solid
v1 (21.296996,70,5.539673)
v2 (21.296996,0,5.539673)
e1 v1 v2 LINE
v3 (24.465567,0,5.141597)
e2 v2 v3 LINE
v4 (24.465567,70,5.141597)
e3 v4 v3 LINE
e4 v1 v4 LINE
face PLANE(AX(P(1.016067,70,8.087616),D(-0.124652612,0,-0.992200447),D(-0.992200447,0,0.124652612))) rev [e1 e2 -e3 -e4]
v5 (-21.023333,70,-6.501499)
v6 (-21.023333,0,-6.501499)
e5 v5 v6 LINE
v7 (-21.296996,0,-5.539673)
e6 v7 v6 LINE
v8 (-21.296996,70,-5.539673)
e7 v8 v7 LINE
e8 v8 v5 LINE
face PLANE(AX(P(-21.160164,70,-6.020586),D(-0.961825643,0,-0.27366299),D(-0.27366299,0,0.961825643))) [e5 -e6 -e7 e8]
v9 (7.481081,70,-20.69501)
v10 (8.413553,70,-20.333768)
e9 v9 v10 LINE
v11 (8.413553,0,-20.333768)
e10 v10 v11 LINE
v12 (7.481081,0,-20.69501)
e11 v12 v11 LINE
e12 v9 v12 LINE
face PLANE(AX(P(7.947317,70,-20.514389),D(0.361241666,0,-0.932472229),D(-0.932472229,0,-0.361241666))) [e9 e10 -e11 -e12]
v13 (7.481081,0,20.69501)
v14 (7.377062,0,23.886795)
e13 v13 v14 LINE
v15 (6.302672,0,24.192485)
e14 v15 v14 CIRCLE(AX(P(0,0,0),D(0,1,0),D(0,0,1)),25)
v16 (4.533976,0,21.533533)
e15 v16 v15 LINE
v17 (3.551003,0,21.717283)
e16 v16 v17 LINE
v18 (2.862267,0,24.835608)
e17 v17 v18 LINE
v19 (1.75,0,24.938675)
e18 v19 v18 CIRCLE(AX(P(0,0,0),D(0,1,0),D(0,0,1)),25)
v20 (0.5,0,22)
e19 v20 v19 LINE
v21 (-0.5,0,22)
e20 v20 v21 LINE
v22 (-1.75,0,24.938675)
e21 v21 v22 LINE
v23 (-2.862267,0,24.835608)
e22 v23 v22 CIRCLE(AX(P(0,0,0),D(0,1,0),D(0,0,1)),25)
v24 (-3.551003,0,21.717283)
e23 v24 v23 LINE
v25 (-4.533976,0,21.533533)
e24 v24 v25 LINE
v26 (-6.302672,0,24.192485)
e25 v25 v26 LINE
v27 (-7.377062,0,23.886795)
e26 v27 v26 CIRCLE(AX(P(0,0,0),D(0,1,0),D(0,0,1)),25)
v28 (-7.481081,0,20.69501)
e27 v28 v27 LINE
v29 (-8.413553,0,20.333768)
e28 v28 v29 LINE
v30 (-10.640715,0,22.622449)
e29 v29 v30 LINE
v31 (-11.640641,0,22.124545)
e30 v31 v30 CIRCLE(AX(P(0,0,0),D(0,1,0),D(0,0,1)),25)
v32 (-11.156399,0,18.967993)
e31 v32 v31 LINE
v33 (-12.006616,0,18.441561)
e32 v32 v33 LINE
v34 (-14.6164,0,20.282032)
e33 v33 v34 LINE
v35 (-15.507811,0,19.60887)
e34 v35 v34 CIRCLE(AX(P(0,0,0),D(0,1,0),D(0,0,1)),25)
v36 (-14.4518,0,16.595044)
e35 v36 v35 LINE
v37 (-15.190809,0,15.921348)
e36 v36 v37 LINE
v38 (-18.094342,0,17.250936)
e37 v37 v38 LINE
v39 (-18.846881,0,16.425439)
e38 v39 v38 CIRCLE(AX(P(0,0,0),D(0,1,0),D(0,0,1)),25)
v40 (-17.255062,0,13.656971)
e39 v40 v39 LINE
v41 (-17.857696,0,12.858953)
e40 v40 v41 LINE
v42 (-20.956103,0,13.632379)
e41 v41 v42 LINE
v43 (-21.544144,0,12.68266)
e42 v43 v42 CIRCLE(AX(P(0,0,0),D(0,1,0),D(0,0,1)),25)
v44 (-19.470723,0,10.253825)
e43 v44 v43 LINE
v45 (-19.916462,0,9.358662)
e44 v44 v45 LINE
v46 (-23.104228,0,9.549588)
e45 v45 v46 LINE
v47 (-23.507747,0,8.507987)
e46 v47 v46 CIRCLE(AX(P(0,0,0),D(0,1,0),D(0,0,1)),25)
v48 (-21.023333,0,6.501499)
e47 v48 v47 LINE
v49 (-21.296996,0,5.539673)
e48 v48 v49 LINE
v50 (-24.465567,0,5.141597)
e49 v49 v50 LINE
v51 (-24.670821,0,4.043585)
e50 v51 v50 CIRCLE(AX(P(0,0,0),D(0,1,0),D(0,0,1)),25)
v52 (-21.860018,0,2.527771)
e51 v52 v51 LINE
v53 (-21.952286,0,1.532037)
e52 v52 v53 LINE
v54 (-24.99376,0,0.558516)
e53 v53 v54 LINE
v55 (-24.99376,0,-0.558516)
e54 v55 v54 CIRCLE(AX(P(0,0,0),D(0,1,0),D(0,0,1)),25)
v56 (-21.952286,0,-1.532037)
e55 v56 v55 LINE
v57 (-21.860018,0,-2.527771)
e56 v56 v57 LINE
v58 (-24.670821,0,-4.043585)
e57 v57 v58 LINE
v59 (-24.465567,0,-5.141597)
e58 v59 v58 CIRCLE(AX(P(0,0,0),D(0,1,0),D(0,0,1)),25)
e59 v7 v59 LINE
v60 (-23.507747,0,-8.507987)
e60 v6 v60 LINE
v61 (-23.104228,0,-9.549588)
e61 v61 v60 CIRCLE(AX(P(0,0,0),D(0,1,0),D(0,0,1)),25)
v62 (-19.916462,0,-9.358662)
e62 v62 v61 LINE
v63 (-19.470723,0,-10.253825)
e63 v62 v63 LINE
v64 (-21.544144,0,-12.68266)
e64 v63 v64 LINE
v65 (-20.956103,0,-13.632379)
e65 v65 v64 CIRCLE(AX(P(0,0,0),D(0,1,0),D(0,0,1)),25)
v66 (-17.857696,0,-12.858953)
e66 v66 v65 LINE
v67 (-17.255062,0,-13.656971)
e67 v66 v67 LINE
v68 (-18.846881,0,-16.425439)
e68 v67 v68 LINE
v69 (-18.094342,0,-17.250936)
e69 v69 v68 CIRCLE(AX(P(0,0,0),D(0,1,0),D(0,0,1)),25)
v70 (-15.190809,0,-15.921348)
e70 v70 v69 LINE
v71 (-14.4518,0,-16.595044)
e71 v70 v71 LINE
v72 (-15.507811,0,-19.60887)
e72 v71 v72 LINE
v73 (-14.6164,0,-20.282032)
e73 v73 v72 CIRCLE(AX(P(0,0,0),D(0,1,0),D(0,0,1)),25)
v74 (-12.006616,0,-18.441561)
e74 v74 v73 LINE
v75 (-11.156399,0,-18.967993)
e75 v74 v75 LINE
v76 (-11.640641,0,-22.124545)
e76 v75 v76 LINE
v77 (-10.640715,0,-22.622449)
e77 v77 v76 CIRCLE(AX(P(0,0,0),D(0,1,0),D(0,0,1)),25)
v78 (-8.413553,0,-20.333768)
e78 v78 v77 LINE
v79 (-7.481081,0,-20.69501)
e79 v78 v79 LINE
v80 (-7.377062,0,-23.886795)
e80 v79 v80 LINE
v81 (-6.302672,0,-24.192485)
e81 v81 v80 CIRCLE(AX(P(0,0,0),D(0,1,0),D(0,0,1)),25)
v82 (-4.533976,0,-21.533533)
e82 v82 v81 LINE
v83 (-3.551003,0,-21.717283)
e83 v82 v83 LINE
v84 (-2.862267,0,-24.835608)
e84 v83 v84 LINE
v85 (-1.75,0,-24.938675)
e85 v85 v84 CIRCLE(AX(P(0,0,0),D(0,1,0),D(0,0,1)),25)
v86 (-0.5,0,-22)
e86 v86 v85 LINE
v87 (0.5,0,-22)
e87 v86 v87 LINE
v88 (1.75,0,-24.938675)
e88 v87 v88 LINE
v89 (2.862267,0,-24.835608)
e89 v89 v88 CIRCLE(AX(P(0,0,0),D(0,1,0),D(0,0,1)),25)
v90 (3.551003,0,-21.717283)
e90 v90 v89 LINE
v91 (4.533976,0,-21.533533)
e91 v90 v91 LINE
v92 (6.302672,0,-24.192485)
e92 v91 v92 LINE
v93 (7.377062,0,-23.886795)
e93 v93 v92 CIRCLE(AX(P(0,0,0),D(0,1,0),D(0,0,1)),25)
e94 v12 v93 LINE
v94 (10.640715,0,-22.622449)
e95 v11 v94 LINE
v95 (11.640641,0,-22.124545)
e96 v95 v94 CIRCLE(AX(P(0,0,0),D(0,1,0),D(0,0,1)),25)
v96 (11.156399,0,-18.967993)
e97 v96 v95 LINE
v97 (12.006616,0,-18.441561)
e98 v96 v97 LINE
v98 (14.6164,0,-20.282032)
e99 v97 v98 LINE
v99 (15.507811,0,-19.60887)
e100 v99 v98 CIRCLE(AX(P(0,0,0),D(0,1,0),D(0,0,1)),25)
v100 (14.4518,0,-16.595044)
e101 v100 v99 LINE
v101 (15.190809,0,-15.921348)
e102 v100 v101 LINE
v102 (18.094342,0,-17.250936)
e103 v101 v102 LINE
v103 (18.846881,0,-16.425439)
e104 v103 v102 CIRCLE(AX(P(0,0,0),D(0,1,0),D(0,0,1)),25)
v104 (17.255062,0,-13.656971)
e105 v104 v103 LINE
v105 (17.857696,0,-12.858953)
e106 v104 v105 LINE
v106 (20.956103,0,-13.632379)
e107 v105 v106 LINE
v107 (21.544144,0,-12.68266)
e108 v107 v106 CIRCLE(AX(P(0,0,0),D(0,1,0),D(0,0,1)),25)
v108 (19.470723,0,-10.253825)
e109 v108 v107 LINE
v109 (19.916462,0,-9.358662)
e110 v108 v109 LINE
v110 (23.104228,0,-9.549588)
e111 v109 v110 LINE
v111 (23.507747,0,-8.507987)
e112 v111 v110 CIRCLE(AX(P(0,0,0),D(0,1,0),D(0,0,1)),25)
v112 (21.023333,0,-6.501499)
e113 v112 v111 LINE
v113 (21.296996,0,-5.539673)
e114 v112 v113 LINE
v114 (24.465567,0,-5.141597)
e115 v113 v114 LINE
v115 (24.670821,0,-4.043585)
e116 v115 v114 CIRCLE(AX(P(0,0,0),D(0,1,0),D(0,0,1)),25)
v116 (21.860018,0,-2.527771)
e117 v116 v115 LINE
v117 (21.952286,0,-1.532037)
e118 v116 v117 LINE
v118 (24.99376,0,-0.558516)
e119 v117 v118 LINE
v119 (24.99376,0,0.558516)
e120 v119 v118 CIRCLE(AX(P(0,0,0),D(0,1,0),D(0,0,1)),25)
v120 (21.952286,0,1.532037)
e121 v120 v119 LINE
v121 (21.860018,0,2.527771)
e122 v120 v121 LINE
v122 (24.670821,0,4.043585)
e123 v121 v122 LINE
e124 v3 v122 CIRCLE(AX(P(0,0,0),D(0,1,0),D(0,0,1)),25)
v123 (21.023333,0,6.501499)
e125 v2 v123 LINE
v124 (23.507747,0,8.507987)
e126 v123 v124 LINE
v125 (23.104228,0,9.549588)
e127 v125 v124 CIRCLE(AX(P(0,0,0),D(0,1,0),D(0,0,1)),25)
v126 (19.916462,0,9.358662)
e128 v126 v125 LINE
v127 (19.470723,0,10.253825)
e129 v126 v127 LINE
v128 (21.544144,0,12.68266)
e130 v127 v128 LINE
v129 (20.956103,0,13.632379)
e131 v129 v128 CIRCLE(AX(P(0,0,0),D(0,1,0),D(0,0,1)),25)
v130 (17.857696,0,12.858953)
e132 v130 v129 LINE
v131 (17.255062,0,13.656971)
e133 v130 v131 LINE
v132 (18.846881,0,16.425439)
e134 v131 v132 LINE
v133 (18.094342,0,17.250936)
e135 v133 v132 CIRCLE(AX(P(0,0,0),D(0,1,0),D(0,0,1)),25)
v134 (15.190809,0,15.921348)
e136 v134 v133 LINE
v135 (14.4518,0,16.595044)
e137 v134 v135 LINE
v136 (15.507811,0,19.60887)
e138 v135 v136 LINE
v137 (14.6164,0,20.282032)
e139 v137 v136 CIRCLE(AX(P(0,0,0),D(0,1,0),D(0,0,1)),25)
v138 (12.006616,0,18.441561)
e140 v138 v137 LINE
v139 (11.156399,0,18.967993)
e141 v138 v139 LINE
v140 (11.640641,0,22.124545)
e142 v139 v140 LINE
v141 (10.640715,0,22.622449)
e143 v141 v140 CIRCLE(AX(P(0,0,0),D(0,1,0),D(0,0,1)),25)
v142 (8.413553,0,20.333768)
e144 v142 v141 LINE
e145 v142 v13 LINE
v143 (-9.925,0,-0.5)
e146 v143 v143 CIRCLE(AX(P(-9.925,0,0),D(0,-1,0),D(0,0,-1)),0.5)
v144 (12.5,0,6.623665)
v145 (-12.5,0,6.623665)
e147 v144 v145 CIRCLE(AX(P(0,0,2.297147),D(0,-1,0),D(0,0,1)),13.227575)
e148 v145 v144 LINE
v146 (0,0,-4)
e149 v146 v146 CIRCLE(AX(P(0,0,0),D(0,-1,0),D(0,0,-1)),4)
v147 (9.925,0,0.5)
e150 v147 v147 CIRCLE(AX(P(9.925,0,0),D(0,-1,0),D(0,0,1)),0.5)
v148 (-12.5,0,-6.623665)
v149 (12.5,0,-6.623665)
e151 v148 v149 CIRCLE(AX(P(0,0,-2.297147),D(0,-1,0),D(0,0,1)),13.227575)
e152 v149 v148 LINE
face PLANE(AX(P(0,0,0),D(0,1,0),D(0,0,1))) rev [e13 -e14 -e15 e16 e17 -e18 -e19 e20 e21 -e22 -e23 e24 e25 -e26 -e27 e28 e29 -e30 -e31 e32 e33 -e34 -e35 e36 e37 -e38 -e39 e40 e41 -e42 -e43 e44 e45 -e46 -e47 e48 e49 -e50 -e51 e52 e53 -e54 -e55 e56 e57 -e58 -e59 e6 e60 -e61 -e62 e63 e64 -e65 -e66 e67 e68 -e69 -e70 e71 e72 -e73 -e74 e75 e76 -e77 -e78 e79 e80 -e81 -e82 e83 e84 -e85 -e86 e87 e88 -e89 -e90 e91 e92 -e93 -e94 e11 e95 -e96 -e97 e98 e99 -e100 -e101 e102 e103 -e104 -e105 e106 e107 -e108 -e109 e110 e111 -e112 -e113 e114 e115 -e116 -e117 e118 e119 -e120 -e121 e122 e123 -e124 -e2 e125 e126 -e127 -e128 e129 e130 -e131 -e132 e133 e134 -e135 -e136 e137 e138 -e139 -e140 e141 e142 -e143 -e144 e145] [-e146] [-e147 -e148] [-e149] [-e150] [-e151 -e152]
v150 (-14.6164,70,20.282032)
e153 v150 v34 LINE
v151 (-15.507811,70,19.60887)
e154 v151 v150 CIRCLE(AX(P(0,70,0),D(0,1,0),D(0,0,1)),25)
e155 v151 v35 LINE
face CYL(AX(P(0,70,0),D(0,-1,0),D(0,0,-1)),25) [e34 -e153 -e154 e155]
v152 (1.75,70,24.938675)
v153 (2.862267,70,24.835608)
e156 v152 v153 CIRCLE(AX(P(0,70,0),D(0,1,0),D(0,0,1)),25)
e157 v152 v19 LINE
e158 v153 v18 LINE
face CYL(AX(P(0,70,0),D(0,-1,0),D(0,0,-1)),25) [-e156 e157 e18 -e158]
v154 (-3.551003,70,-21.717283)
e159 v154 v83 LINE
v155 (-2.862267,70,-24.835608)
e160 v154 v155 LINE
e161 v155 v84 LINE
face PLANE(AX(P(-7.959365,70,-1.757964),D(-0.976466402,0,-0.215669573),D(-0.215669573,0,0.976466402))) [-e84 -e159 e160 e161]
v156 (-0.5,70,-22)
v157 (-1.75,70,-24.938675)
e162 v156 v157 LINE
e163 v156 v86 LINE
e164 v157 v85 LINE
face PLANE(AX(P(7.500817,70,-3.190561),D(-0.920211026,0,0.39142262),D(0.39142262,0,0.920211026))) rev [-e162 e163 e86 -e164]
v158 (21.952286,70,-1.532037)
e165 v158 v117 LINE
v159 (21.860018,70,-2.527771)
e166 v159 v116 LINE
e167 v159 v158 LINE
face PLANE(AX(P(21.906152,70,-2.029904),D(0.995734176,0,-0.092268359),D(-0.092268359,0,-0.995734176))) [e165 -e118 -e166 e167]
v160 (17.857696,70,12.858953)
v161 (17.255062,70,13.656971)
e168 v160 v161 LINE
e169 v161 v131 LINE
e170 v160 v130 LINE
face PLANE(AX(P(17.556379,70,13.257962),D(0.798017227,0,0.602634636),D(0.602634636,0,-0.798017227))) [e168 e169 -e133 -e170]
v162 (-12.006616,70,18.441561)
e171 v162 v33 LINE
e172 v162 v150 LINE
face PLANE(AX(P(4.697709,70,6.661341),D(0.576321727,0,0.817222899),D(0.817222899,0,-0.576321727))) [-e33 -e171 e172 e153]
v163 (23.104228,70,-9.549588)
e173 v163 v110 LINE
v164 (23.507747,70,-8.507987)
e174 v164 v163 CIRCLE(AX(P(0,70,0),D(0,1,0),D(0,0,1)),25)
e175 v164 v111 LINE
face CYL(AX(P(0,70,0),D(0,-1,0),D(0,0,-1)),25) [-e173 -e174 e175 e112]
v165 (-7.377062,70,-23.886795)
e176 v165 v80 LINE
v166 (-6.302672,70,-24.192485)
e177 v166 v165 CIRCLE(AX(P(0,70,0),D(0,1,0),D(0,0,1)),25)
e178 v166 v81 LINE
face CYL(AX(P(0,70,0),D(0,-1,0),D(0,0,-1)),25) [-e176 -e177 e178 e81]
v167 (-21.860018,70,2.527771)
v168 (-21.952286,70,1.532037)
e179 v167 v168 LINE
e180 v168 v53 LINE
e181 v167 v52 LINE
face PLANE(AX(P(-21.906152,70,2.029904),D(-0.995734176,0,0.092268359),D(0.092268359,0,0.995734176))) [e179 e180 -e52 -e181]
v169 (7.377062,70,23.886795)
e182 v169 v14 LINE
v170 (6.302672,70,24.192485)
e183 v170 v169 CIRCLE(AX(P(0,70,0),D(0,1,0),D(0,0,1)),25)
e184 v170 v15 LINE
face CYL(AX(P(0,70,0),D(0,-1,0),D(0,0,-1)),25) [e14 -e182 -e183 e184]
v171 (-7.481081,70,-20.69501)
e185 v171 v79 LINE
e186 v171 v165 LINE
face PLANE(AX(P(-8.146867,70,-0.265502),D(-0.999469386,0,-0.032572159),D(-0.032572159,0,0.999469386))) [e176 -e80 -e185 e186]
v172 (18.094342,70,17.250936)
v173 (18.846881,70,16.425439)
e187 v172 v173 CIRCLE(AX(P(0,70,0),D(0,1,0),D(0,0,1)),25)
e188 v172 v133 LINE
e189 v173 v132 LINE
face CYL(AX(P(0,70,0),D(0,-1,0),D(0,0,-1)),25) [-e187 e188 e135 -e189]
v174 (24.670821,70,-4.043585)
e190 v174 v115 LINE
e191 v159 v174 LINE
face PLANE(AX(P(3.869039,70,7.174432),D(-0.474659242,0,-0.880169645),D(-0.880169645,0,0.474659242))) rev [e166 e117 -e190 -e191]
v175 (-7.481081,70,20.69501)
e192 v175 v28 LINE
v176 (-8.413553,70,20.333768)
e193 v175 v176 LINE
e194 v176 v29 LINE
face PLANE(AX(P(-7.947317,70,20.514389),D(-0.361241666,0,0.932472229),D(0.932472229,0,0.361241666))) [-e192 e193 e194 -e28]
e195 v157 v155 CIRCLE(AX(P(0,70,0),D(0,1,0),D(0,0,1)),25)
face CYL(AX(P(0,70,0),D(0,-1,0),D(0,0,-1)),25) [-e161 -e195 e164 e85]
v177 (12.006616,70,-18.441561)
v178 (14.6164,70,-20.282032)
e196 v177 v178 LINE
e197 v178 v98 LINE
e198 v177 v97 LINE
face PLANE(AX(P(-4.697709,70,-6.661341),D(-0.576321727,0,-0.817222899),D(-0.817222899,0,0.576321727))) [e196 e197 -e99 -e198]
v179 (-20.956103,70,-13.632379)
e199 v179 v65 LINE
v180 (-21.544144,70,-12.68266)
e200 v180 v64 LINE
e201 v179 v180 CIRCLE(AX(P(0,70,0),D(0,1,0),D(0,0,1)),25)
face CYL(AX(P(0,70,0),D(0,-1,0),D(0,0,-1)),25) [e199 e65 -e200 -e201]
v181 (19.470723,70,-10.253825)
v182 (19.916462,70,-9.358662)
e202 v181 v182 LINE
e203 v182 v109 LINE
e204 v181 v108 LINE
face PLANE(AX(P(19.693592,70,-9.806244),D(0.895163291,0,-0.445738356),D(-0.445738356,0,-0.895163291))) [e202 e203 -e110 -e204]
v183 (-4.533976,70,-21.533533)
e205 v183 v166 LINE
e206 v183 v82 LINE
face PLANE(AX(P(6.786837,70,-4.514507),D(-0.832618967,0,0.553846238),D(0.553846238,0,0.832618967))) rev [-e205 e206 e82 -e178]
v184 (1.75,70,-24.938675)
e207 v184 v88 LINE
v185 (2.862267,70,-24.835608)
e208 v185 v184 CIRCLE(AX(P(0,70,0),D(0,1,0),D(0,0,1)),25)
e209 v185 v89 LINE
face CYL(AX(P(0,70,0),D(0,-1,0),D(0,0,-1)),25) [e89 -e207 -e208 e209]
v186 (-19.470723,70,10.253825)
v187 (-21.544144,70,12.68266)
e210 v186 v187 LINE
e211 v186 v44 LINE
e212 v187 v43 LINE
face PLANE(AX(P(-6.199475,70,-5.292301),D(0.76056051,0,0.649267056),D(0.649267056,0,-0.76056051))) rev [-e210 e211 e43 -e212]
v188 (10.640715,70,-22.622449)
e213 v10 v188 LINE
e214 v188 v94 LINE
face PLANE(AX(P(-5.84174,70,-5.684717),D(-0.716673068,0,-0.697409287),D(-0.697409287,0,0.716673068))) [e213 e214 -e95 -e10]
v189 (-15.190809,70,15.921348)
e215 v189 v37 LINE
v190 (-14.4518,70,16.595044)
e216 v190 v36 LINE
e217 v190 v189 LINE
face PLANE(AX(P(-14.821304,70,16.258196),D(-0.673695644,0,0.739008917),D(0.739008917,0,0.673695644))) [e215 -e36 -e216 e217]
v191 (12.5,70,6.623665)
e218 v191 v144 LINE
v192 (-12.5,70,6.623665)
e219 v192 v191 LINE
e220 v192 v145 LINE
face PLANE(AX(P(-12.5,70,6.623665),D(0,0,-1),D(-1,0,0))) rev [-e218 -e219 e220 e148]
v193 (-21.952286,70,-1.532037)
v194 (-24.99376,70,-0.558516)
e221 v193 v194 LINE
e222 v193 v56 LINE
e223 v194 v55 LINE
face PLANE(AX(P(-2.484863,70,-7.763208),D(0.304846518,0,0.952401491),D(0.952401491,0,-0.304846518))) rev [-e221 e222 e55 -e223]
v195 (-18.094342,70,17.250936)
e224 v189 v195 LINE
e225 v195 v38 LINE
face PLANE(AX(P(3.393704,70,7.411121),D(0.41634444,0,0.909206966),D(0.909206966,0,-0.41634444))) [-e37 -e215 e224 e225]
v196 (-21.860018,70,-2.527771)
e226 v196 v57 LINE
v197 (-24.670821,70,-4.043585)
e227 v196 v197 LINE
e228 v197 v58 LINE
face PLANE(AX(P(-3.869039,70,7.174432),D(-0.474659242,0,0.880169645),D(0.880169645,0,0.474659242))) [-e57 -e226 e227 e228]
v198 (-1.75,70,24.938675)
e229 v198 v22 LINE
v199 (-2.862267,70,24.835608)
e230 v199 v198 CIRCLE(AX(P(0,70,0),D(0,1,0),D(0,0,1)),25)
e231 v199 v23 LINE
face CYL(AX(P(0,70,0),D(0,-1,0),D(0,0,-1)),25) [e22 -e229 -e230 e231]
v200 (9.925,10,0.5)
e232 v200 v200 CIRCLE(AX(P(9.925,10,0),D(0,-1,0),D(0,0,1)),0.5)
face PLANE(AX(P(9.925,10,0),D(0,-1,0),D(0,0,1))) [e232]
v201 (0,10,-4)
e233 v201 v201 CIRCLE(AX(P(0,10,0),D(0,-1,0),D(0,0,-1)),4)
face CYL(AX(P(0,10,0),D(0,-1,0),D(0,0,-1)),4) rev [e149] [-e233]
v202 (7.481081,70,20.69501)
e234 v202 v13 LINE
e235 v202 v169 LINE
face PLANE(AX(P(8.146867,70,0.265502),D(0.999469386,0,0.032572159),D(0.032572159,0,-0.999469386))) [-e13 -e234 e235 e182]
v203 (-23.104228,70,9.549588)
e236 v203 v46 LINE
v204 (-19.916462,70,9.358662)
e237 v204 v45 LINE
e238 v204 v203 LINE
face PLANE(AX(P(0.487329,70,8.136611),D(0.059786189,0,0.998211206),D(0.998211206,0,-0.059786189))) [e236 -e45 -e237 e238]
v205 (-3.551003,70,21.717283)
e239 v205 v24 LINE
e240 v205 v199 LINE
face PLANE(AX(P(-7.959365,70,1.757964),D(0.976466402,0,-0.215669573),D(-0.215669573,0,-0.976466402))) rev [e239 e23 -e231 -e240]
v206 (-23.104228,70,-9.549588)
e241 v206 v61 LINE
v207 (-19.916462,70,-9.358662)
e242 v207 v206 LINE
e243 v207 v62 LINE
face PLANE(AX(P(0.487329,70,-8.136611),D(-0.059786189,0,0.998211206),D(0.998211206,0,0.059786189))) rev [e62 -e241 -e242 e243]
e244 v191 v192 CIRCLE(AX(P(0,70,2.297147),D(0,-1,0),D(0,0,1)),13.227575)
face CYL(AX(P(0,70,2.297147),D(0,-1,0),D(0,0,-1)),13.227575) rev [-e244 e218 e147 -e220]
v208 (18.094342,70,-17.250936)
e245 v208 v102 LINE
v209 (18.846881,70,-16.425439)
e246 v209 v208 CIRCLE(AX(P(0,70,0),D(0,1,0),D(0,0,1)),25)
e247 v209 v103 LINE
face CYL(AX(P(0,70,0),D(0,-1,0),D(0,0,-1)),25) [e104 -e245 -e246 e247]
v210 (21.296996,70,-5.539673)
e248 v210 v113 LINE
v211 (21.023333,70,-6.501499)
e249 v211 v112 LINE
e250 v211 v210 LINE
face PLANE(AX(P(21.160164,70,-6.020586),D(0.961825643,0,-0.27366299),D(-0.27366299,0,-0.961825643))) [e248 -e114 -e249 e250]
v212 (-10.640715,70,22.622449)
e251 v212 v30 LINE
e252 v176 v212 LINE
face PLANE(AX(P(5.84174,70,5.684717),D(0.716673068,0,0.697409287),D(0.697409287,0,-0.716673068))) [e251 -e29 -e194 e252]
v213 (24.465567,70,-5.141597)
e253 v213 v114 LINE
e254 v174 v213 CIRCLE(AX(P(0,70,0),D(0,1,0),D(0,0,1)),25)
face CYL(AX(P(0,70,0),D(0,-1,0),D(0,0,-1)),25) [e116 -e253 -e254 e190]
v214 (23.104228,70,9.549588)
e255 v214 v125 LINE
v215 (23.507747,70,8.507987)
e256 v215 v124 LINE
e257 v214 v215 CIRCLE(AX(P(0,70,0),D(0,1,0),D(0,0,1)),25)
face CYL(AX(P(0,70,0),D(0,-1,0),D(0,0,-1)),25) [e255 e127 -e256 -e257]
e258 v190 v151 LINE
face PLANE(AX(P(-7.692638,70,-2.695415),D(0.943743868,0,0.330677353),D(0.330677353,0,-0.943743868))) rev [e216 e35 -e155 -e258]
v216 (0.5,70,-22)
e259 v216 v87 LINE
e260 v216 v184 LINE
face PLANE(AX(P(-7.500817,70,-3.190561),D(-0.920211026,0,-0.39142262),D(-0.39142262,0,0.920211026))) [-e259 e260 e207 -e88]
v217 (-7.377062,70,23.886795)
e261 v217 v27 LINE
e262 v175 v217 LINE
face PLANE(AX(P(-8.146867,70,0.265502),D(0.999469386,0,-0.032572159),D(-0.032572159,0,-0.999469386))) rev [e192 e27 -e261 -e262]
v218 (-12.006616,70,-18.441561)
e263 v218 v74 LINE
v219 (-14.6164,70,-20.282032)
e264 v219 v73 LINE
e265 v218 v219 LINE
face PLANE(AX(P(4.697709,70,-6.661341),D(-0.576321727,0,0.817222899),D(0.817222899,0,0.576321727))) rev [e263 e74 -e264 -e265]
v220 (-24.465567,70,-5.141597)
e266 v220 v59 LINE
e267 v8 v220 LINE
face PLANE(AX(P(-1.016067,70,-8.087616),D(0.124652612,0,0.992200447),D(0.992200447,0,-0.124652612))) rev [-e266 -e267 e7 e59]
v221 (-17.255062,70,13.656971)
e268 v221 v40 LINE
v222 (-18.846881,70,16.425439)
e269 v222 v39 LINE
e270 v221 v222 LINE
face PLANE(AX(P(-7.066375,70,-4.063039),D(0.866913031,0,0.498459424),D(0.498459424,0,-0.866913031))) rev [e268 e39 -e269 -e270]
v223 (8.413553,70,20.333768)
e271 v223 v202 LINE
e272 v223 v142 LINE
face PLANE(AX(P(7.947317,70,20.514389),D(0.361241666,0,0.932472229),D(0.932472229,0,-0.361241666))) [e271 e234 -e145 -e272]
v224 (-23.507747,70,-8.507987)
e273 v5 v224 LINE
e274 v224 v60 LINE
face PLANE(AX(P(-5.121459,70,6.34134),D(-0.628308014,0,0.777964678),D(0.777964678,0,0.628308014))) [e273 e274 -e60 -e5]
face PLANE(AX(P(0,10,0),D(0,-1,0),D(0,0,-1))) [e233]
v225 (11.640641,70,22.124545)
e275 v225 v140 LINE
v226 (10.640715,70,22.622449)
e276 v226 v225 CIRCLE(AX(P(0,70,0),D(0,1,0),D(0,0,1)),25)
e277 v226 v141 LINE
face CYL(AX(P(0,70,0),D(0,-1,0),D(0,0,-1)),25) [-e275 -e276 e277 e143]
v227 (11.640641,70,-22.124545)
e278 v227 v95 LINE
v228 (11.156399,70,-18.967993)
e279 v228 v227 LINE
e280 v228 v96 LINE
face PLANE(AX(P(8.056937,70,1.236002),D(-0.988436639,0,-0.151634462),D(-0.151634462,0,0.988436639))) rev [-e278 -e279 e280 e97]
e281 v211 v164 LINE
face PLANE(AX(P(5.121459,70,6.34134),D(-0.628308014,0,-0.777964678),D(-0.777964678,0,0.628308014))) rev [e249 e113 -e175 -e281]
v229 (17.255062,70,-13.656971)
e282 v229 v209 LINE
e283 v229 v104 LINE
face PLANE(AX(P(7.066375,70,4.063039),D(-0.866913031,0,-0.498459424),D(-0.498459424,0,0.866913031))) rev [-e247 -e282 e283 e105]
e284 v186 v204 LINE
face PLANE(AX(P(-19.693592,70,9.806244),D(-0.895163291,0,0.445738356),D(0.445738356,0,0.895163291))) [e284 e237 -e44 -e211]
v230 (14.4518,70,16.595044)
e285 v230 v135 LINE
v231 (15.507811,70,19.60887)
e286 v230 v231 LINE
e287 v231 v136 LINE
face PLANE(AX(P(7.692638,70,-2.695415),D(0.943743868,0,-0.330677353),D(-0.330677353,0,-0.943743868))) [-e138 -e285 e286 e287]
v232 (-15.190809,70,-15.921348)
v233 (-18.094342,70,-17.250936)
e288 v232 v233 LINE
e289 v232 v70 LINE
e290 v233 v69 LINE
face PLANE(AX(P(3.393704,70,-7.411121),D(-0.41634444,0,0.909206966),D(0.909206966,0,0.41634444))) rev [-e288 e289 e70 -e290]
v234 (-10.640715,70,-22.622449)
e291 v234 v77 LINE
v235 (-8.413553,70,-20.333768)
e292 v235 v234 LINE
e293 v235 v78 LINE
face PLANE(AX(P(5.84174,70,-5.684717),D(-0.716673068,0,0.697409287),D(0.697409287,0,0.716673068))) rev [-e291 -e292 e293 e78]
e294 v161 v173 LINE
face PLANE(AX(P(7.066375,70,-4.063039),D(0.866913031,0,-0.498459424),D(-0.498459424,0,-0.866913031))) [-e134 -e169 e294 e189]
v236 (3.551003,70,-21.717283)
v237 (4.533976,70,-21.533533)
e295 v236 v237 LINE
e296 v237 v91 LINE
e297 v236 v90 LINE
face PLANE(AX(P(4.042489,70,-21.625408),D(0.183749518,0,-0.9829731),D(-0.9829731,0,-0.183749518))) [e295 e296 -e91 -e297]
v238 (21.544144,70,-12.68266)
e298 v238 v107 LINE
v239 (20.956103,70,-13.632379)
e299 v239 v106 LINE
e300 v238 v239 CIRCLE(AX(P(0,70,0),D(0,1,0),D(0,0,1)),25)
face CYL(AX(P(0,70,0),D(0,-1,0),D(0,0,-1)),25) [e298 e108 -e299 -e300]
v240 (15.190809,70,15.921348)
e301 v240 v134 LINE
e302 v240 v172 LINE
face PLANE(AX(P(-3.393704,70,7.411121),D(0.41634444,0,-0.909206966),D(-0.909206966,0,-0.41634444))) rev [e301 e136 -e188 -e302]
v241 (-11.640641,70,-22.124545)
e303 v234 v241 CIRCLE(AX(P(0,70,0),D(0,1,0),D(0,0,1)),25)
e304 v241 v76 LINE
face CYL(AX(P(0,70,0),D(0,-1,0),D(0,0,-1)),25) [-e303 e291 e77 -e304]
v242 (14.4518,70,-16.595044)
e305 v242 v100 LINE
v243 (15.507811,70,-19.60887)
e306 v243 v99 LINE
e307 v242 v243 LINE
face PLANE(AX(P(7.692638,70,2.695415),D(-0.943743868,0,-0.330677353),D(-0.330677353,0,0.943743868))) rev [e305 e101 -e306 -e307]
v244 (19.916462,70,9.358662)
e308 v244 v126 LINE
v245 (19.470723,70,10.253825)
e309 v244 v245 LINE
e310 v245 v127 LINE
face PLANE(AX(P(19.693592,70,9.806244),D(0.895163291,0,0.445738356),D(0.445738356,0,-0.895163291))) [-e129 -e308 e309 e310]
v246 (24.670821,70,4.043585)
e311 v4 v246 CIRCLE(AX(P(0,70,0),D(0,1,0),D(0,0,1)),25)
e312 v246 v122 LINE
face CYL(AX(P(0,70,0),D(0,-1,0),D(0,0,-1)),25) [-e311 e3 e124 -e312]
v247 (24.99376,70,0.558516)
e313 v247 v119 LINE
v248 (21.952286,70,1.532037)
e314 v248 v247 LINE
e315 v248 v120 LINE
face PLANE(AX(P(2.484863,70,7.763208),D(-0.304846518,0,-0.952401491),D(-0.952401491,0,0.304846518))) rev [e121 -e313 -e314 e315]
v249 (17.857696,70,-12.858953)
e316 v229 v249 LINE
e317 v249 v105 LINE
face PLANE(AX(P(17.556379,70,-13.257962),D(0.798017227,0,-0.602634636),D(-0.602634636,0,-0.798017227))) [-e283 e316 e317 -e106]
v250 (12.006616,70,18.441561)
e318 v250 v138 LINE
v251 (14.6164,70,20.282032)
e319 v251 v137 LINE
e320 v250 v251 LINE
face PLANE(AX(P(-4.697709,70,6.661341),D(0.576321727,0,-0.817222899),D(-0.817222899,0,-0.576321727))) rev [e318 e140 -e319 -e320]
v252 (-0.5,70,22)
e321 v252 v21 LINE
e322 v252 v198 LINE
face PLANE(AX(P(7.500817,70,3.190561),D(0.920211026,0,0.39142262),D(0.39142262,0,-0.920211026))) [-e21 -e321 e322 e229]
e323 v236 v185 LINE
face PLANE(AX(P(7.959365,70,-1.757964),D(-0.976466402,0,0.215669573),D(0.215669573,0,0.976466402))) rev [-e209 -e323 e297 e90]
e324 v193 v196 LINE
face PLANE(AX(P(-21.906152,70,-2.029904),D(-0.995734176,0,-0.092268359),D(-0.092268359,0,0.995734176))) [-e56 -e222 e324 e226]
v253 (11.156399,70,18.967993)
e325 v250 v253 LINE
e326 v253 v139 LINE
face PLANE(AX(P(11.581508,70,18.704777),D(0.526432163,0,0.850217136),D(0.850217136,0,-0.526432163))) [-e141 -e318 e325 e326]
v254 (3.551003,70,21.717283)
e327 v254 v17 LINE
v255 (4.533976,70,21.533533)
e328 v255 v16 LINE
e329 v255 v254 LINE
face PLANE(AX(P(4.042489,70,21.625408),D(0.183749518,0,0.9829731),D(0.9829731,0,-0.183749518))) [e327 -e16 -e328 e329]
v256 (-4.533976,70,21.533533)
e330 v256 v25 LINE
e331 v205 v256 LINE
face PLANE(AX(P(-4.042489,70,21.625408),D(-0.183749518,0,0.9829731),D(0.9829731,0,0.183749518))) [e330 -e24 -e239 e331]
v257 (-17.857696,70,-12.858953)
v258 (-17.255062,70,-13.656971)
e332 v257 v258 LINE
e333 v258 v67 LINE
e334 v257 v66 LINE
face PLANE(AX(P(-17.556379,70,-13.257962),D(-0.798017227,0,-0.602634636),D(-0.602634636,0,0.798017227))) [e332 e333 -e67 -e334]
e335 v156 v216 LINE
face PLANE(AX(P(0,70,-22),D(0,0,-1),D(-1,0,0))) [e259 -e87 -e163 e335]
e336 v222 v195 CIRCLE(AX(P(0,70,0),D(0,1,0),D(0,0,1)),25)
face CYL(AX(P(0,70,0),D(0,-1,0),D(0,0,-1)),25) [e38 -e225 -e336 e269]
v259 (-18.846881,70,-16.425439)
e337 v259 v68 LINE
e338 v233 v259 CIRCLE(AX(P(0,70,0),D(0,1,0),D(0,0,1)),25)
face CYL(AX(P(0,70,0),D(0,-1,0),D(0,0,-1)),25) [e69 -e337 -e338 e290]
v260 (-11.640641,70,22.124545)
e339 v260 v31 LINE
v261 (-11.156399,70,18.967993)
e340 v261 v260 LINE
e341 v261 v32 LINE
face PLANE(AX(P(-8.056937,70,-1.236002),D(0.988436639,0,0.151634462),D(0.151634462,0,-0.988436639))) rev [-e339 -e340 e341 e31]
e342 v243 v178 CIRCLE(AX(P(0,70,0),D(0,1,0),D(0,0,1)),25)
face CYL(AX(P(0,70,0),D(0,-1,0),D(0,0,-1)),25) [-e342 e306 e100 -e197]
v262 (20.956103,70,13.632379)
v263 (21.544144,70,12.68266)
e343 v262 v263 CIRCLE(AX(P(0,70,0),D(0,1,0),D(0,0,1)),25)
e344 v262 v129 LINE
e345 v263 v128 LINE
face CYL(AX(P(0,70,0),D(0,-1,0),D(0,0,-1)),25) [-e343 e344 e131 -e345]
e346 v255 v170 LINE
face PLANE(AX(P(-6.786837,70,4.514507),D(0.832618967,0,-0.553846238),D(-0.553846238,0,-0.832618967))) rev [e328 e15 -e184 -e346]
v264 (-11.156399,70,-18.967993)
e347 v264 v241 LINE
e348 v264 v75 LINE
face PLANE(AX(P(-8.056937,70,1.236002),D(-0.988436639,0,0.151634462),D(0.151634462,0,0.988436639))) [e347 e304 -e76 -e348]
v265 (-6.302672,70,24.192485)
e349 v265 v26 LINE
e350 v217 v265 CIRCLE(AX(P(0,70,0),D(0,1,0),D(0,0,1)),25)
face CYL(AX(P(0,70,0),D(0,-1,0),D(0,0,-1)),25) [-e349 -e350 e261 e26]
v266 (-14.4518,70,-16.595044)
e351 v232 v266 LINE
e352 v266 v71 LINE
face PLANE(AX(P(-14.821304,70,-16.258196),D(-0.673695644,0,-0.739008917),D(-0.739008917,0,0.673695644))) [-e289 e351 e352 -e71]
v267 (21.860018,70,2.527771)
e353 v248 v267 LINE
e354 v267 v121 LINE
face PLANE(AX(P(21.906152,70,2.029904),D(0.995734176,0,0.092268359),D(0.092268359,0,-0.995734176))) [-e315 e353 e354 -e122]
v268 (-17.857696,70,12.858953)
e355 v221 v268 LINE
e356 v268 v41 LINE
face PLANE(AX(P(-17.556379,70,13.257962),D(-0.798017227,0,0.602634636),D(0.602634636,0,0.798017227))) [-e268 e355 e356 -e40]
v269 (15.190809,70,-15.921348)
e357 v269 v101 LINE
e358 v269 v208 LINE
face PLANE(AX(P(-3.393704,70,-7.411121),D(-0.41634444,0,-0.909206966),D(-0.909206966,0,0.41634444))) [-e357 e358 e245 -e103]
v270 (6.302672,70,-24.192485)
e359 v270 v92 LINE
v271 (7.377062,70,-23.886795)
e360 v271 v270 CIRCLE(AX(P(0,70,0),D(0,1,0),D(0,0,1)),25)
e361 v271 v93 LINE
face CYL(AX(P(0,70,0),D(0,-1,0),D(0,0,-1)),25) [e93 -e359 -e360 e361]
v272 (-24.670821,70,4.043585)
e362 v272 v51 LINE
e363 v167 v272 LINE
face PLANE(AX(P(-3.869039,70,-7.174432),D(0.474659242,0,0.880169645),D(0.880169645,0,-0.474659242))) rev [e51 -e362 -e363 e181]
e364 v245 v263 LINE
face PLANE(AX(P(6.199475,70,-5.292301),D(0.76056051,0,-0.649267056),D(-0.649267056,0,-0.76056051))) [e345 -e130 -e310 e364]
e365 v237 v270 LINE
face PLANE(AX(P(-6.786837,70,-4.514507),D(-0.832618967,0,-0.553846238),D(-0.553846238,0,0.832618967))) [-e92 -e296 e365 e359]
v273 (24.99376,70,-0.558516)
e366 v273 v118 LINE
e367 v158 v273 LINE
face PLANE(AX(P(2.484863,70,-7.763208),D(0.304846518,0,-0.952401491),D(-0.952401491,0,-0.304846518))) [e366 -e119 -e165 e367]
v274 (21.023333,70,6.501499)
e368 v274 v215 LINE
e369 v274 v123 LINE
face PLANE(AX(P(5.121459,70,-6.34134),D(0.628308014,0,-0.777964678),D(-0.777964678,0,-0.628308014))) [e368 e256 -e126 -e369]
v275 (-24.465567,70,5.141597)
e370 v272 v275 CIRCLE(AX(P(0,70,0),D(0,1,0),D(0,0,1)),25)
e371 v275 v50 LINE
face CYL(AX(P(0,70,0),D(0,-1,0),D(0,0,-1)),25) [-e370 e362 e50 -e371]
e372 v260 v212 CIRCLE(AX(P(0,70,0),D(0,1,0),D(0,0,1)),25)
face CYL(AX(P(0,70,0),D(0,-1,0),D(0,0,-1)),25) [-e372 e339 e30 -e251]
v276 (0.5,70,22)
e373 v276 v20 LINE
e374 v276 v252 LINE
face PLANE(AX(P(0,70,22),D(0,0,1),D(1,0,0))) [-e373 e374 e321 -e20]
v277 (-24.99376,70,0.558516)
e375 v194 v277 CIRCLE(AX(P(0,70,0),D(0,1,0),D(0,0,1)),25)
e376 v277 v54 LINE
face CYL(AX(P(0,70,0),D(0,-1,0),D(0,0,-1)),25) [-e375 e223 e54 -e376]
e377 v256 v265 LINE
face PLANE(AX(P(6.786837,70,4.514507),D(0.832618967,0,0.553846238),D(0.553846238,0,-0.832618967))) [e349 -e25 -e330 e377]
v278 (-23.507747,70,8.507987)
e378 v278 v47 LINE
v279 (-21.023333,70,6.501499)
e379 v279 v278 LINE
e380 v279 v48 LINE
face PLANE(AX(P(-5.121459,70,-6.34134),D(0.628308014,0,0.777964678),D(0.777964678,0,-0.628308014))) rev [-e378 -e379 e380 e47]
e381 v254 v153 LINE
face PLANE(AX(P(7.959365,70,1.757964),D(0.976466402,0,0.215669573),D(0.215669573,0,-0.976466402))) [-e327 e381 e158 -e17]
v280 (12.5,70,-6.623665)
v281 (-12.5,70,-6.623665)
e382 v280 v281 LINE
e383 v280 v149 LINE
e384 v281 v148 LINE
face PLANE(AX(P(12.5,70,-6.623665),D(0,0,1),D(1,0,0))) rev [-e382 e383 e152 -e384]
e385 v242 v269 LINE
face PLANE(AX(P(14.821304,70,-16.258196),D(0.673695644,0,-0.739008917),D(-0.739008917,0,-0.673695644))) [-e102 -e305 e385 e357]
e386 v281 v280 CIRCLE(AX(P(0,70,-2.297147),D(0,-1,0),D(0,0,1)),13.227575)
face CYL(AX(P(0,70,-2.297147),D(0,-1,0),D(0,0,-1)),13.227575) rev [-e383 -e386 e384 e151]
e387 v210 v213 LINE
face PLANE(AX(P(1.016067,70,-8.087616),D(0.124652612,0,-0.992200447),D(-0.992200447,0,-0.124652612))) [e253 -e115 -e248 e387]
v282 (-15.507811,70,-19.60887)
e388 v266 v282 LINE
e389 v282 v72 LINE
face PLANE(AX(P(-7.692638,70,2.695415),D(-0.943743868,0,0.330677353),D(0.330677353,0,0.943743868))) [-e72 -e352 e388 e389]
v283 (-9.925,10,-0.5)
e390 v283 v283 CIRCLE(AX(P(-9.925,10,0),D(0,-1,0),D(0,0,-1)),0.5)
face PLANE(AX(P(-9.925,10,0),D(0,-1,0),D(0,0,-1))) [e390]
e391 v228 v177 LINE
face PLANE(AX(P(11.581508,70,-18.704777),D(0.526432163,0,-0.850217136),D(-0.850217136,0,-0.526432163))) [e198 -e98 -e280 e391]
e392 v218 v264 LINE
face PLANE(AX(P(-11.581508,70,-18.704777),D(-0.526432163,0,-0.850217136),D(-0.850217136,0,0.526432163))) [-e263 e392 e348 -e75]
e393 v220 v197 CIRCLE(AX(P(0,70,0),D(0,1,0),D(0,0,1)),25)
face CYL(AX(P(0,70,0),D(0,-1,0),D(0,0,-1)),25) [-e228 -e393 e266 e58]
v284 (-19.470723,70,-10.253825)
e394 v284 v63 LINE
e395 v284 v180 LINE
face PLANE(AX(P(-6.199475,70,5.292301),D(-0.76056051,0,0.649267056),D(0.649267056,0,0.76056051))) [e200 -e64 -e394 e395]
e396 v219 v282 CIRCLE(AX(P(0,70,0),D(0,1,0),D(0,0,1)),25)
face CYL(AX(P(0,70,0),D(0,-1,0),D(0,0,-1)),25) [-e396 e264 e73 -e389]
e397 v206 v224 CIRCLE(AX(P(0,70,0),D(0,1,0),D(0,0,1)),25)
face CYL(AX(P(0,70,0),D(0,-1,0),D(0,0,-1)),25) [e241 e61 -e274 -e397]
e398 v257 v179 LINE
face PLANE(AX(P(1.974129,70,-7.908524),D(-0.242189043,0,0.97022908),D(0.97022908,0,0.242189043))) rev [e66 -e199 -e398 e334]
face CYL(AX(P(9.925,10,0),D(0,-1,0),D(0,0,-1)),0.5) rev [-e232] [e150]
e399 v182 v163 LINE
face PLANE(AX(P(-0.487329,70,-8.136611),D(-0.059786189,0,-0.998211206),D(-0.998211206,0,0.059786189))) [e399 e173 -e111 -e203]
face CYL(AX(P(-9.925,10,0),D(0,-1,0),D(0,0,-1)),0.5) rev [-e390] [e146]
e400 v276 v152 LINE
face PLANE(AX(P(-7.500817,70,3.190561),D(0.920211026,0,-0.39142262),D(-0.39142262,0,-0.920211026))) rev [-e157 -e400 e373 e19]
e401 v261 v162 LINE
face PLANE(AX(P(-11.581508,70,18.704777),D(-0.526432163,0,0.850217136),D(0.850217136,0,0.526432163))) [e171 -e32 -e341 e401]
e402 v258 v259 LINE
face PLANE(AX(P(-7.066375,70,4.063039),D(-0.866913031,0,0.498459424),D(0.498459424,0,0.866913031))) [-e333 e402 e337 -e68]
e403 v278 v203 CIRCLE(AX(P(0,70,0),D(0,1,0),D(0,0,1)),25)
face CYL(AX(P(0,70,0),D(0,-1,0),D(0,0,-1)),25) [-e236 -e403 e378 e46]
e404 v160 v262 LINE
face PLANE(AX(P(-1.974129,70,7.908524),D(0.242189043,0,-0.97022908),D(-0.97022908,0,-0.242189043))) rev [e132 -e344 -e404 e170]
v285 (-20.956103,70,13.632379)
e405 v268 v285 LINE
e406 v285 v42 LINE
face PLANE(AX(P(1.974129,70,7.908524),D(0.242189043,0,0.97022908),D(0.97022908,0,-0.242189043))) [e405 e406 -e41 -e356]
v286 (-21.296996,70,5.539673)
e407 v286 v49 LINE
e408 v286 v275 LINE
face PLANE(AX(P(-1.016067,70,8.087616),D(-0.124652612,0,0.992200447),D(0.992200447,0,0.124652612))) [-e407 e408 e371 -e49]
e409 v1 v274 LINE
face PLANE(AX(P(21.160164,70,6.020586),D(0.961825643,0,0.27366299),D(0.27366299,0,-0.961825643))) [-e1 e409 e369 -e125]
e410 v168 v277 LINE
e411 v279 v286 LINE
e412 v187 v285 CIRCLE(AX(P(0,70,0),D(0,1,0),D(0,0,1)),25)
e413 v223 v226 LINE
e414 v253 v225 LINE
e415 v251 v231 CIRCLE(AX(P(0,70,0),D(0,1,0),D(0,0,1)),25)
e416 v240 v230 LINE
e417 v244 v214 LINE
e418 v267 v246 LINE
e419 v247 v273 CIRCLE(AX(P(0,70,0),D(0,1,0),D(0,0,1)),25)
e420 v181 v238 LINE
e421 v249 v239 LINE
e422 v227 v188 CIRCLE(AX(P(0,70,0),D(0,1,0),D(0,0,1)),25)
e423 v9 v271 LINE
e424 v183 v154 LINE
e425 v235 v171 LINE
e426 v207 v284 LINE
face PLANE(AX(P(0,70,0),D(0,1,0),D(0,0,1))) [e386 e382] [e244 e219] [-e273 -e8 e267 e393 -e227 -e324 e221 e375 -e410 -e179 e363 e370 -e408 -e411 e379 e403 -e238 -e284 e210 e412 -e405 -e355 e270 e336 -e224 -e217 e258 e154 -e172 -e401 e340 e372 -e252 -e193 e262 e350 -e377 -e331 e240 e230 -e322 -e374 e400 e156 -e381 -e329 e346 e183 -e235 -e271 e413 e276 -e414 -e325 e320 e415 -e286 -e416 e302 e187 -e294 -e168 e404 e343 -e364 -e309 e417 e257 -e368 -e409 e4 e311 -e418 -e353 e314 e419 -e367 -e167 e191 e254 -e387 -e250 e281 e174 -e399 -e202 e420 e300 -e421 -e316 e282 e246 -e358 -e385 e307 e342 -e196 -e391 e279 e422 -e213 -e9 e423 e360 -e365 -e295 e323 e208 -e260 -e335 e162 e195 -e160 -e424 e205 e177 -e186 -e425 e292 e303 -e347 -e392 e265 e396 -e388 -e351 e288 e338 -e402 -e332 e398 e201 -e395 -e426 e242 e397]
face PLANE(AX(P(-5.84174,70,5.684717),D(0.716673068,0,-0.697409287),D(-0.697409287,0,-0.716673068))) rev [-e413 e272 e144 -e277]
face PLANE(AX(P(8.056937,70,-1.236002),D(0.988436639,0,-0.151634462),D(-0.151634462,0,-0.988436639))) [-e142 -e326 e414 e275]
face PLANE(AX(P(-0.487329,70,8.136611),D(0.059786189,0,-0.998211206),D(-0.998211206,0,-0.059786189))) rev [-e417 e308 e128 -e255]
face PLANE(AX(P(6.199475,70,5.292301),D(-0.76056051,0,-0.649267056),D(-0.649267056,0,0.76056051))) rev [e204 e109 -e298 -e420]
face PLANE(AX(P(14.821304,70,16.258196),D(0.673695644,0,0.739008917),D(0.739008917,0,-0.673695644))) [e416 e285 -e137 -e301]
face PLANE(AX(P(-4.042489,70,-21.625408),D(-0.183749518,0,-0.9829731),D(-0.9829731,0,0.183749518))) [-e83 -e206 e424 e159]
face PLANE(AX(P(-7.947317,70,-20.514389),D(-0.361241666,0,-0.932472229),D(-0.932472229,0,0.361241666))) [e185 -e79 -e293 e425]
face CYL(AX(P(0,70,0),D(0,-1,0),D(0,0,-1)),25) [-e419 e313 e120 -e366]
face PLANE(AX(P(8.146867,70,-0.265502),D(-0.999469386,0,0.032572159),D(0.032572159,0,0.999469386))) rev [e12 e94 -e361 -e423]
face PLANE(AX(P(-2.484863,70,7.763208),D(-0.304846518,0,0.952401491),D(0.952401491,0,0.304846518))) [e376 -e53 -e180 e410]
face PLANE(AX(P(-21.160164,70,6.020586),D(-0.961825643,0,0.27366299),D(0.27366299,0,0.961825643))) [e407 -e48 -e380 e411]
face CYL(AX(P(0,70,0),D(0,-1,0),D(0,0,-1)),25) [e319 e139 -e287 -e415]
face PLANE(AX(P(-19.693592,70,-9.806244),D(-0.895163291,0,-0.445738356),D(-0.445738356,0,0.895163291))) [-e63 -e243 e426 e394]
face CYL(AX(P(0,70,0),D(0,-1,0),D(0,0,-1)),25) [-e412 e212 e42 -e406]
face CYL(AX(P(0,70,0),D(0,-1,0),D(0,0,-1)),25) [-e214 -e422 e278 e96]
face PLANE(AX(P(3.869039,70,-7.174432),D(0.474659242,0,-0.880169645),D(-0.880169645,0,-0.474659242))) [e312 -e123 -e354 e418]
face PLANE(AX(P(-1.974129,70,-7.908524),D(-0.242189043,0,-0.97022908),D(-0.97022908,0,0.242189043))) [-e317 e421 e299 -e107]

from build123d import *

# Parameters (mm, degrees)
BOSS_EXTRUDE2_DEPTH = 70
SKETCH3_R           = 4
CUT_EXTRUDE1_DEPTH  = 10
SKETCH4_R           = 0.5
CUT_EXTRUDE2_DEPTH  = 10
CIRPATTERN1_COUNT   = 2
CUT_EXTRUDE3_DEPTH  = 79.402407488


# Read off the part's stored shape, not the designer's step: Boss-Extrude2
with BuildPart() as part:
    # Boss-Extrude2 outline → Boss-Extrude2 (new body)
    with BuildSketch(Plane(origin=(0, 0, 0), x_dir=(1, 0, 0), z_dir=(0, 1, 0))):
        with BuildLine():
            Line((1.75, 24.938674784), (0.5, 22))
            Line((0.5, 22), (-0.5, 22))
            Line((-0.5, 22), (-1.75, 24.938674784))
            ThreePointArc((-1.75, 24.938674784), (-2.306708986, 24.893354407), (-2.862266542, 24.835608111))
            Line((-2.862266542, 24.835608111), (-3.551002842, 21.717282952))
            Line((-3.551002842, 21.717282952), (-4.533975942, 21.533533434))
            Line((-4.533975942, 21.533533434), (-6.302672391, 24.192484799))
            ThreePointArc((-6.302672391, 24.192484799), (-6.841574752, 24.045641079), (-7.37706203, 23.88679459))
            Line((-7.37706203, 23.88679459), (-7.481080541, 20.69500988))
            Line((-7.481080541, 20.69500988), (-8.413552771, 20.333768214))
            Line((-8.413552771, 20.333768214), (-10.640714833, 22.622448759))
            ThreePointArc((-10.640714833, 22.622448759), (-11.143458894, 22.379082284), (-11.640640518, 22.124544929))
            Line((-11.640640518, 22.124544929), (-11.156399015, 18.967993067))
            Line((-11.156399015, 18.967993067), (-12.006616151, 18.441560905))
            Line((-12.006616151, 18.441560905), (-14.616400494, 20.282032359))
            ThreePointArc((-14.616400494, 20.282032359), (-15.065865909, 19.950430682), (-15.507810955, 19.608870426))
            Line((-15.507810955, 19.608870426), (-14.451799702, 16.595044001))
            Line((-14.451799702, 16.595044001), (-15.190808619, 15.921348357))
            Line((-15.190808619, 15.921348357), (-18.094342166, 17.250935673))
            ThreePointArc((-18.094342166, 17.250935673), (-18.475222931, 16.842391091), (-18.84688149, 16.425439358))
            Line((-18.84688149, 16.425439358), (-17.255061682, 13.656970614))
            Line((-17.255061682, 13.656970614), (-17.857696318, 12.858953387))
            Line((-17.857696318, 12.858953387), (-20.956102717, 13.632379063))
            ThreePointArc((-20.956102717, 13.632379063), (-21.255428393, 13.160804072), (-21.544144079, 12.682659653))
            Line((-21.544144079, 12.682659653), (-19.470723232, 10.253825473))
            Line((-19.470723232, 10.253825473), (-19.916461588, 9.358662181))
            Line((-19.916461588, 9.358662181), (-23.104228325, 9.549588134))
            ThreePointArc((-23.104228325, 9.549588134), (-23.311805735, 9.031041654), (-23.507746682, 8.507987185))
            Line((-23.507746682, 8.507987185), (-21.023332655, 6.501498603))
            Line((-21.023332655, 6.501498603), (-21.296995645, 5.53967296))
            Line((-21.296995645, 5.53967296), (-24.465567147, 5.141597434))
            ThreePointArc((-24.465567147, 5.141597434), (-24.574327492, 4.593737945), (-24.670821165, 4.043585418))
            Line((-24.670821165, 4.043585418), (-21.860017699, 2.527770996))
            Line((-21.860017699, 2.527770996), (-21.952286058, 1.53203682))
            Line((-21.952286058, 1.53203682), (-24.993760423, 0.558515801))
            ThreePointArc((-24.993760423, 0.558515801), (-25, 0), (-24.993760423, -0.558515801))
            Line((-24.993760423, -0.558515801), (-21.952286058, -1.53203682))
            Line((-21.952286058, -1.53203682), (-21.860017699, -2.527770996))
            Line((-21.860017699, -2.527770996), (-24.670821165, -4.043585418))
            ThreePointArc((-24.670821165, -4.043585418), (-24.574327492, -4.593737945), (-24.465567147, -5.141597434))
            Line((-24.465567147, -5.141597434), (-21.296995645, -5.53967296))
            Line((-21.296995645, -5.53967296), (-21.023332655, -6.501498603))
            Line((-21.023332655, -6.501498603), (-23.507746682, -8.507987185))
            ThreePointArc((-23.507746682, -8.507987185), (-23.311805735, -9.031041654), (-23.104228325, -9.549588134))
            Line((-23.104228325, -9.549588134), (-19.916461588, -9.358662181))
            Line((-19.916461588, -9.358662181), (-19.470723232, -10.253825473))
            Line((-19.470723232, -10.253825473), (-21.544144079, -12.682659654))
            ThreePointArc((-21.544144079, -12.682659654), (-21.255428393, -13.160804072), (-20.956102717, -13.632379063))
            Line((-20.956102717, -13.632379063), (-17.857696318, -12.858953387))
            Line((-17.857696318, -12.858953387), (-17.255061682, -13.656970614))
            Line((-17.255061682, -13.656970614), (-18.84688149, -16.425439358))
            ThreePointArc((-18.84688149, -16.425439358), (-18.475222931, -16.842391091), (-18.094342166, -17.250935673))
            Line((-18.094342166, -17.250935673), (-15.190808619, -15.921348357))
            Line((-15.190808619, -15.921348357), (-14.451799702, -16.595044001))
            Line((-14.451799702, -16.595044001), (-15.507810955, -19.608870426))
            ThreePointArc((-15.507810955, -19.608870426), (-15.065865909, -19.950430682), (-14.616400494, -20.282032359))
            Line((-14.616400494, -20.282032359), (-12.006616151, -18.441560905))
            Line((-12.006616151, -18.441560905), (-11.156399015, -18.967993067))
            Line((-11.156399015, -18.967993067), (-11.640640518, -22.124544929))
            ThreePointArc((-11.640640518, -22.124544929), (-11.143458894, -22.379082284), (-10.640714833, -22.622448759))
            Line((-10.640714833, -22.622448759), (-8.413552771, -20.333768214))
            Line((-8.413552771, -20.333768214), (-7.481080541, -20.69500988))
            Line((-7.481080541, -20.69500988), (-7.37706203, -23.88679459))
            ThreePointArc((-7.37706203, -23.88679459), (-6.841574752, -24.045641079), (-6.302672391, -24.192484799))
            Line((-6.302672391, -24.192484799), (-4.533975942, -21.533533434))
            Line((-4.533975942, -21.533533434), (-3.551002842, -21.717282952))
            Line((-3.551002842, -21.717282952), (-2.862266542, -24.835608111))
            ThreePointArc((-2.862266542, -24.835608111), (-2.306708986, -24.893354407), (-1.75, -24.938674784))
            Line((-1.75, -24.938674784), (-0.5, -22))
            Line((-0.5, -22), (0.5, -22))
            Line((0.5, -22), (1.75, -24.938674784))
            ThreePointArc((1.75, -24.938674784), (2.306708986, -24.893354407), (2.862266542, -24.835608111))
            Line((2.862266542, -24.835608111), (3.551002842, -21.717282952))
            Line((3.551002842, -21.717282952), (4.533975942, -21.533533434))
            Line((4.533975942, -21.533533434), (6.302672391, -24.192484799))
            ThreePointArc((6.302672391, -24.192484799), (6.841574752, -24.045641079), (7.37706203, -23.88679459))
            Line((7.37706203, -23.88679459), (7.481080541, -20.69500988))
            Line((7.481080541, -20.69500988), (8.413552771, -20.333768214))
            Line((8.413552771, -20.333768214), (10.640714833, -22.622448759))
            ThreePointArc((10.640714833, -22.622448759), (11.143458895, -22.379082284), (11.640640519, -22.124544929))
            Line((11.640640519, -22.124544929), (11.156399015, -18.967993067))
            Line((11.156399015, -18.967993067), (12.006616151, -18.441560905))
            Line((12.006616151, -18.441560905), (14.616400494, -20.282032359))
            ThreePointArc((14.616400494, -20.282032359), (15.065865909, -19.950430682), (15.507810955, -19.608870426))
            Line((15.507810955, -19.608870426), (14.451799702, -16.595044001))
            Line((14.451799702, -16.595044001), (15.190808619, -15.921348357))
            Line((15.190808619, -15.921348357), (18.094342166, -17.250935673))
            ThreePointArc((18.094342166, -17.250935673), (18.475222931, -16.842391091), (18.84688149, -16.425439358))
            Line((18.84688149, -16.425439358), (17.255061682, -13.656970614))
            Line((17.255061682, -13.656970614), (17.857696318, -12.858953387))
            Line((17.857696318, -12.858953387), (20.956102717, -13.632379063))
            ThreePointArc((20.956102717, -13.632379063), (21.255428393, -13.160804072), (21.544144079, -12.682659653))
            Line((21.544144079, -12.682659653), (19.470723232, -10.253825473))
            Line((19.470723232, -10.253825473), (19.916461588, -9.358662181))
            Line((19.916461588, -9.358662181), (23.104228325, -9.549588134))
            ThreePointArc((23.104228325, -9.549588134), (23.311805735, -9.031041654), (23.507746682, -8.507987185))
            Line((23.507746682, -8.507987185), (21.023332655, -6.501498603))
            Line((21.023332655, -6.501498603), (21.296995645, -5.53967296))
            Line((21.296995645, -5.53967296), (24.465567147, -5.141597434))
            ThreePointArc((24.465567147, -5.141597434), (24.574327492, -4.593737945), (24.670821165, -4.043585418))
            Line((24.670821165, -4.043585418), (21.860017699, -2.527770996))
            Line((21.860017699, -2.527770996), (21.952286058, -1.53203682))
            Line((21.952286058, -1.53203682), (24.993760423, -0.558515801))
            ThreePointArc((24.993760423, -0.558515801), (25, 0), (24.993760423, 0.558515801))
            Line((24.993760423, 0.558515801), (21.952286058, 1.53203682))
            Line((21.952286058, 1.53203682), (21.860017699, 2.527770996))
            Line((21.860017699, 2.527770996), (24.670821165, 4.043585418))
            ThreePointArc((24.670821165, 4.043585418), (24.574327492, 4.593737945), (24.465567147, 5.141597434))
            Line((24.465567147, 5.141597434), (21.296995645, 5.53967296))
            Line((21.296995645, 5.53967296), (21.023332655, 6.501498603))
            Line((21.023332655, 6.501498603), (23.507746682, 8.507987185))
            ThreePointArc((23.507746682, 8.507987185), (23.311805735, 9.031041654), (23.104228325, 9.549588134))
            Line((23.104228325, 9.549588134), (19.916461588, 9.358662181))
            Line((19.916461588, 9.358662181), (19.470723232, 10.253825473))
            Line((19.470723232, 10.253825473), (21.544144079, 12.682659653))
            ThreePointArc((21.544144079, 12.682659653), (21.255428393, 13.160804072), (20.956102717, 13.632379063))
            Line((20.956102717, 13.632379063), (17.857696318, 12.858953387))
            Line((17.857696318, 12.858953387), (17.255061682, 13.656970614))
            Line((17.255061682, 13.656970614), (18.84688149, 16.425439358))
            ThreePointArc((18.84688149, 16.425439358), (18.475222931, 16.842391091), (18.094342166, 17.250935673))
            Line((18.094342166, 17.250935673), (15.190808619, 15.921348357))
            Line((15.190808619, 15.921348357), (14.451799702, 16.595044001))
            Line((14.451799702, 16.595044001), (15.507810955, 19.608870426))
            ThreePointArc((15.507810955, 19.608870426), (15.065865909, 19.950430682), (14.616400494, 20.282032359))
            Line((14.616400494, 20.282032359), (12.006616151, 18.441560905))
            Line((12.006616151, 18.441560905), (11.156399015, 18.967993067))
            Line((11.156399015, 18.967993067), (11.640640518, 22.124544929))
            ThreePointArc((11.640640518, 22.124544929), (11.143458894, 22.379082284), (10.640714833, 22.622448759))
            Line((10.640714833, 22.622448759), (8.413552771, 20.333768214))
            Line((8.413552771, 20.333768214), (7.481080541, 20.69500988))
            Line((7.481080541, 20.69500988), (7.37706203, 23.88679459))
            ThreePointArc((7.37706203, 23.88679459), (6.841574752, 24.045641079), (6.302672391, 24.192484799))
            Line((6.302672391, 24.192484799), (4.533975942, 21.533533434))
            Line((4.533975942, 21.533533434), (3.551002842, 21.717282952))
            Line((3.551002842, 21.717282952), (2.862266542, 24.835608111))
            ThreePointArc((2.862266542, 24.835608111), (2.306708986, 24.893354407), (1.75, 24.938674784))
        make_face()
    extrude(amount=BOSS_EXTRUDE2_DEPTH)

    # Sketch3 → Cut-Extrude1 (cut)
    with BuildSketch(Plane.XZ):
        with Locations(Location((0, 0, 0), (0, 0, 270))):
            Circle(SKETCH3_R)
    extrude(amount=-CUT_EXTRUDE1_DEPTH, mode=Mode.SUBTRACT)

    # Sketch4 → Cut-Extrude2 (cut)
    with BuildSketch(Plane.XZ):
        with Locations(Location((-9.925, 0, 0), (0, 0, 270))):
            Circle(SKETCH4_R)
    cut_extrude2 = extrude(amount=-CUT_EXTRUDE2_DEPTH, mode=Mode.SUBTRACT)

    # CirPattern1: Cut-Extrude2 ×2 about axis
    cirpattern1_axis = Axis((0, 0, 0), (0, 1, 0))
    for i in range(1, CIRPATTERN1_COUNT):
        add(cut_extrude2.rotate(cirpattern1_axis, i * 360 / CIRPATTERN1_COUNT), mode=Mode.SUBTRACT)

    # Sketch5 → Cut-Extrude3 (cut, through all)
    with BuildSketch(Plane.XZ):
        with BuildLine():
            Line((-12.5, 6.623664739), (12.5, 6.623664739))
            ThreePointArc((12.5, 6.623664739), (0, 15.524722913), (-12.5, 6.623664739))
        make_face()
        with BuildLine():
            Line((12.5, -6.623664739), (-12.5, -6.623664739))
            ThreePointArc((-12.5, -6.623664739), (0, -15.524722913), (12.5, -6.623664739))
        make_face()
    extrude(amount=-CUT_EXTRUDE3_DEPTH, mode=Mode.SUBTRACT)


solid = part.part
